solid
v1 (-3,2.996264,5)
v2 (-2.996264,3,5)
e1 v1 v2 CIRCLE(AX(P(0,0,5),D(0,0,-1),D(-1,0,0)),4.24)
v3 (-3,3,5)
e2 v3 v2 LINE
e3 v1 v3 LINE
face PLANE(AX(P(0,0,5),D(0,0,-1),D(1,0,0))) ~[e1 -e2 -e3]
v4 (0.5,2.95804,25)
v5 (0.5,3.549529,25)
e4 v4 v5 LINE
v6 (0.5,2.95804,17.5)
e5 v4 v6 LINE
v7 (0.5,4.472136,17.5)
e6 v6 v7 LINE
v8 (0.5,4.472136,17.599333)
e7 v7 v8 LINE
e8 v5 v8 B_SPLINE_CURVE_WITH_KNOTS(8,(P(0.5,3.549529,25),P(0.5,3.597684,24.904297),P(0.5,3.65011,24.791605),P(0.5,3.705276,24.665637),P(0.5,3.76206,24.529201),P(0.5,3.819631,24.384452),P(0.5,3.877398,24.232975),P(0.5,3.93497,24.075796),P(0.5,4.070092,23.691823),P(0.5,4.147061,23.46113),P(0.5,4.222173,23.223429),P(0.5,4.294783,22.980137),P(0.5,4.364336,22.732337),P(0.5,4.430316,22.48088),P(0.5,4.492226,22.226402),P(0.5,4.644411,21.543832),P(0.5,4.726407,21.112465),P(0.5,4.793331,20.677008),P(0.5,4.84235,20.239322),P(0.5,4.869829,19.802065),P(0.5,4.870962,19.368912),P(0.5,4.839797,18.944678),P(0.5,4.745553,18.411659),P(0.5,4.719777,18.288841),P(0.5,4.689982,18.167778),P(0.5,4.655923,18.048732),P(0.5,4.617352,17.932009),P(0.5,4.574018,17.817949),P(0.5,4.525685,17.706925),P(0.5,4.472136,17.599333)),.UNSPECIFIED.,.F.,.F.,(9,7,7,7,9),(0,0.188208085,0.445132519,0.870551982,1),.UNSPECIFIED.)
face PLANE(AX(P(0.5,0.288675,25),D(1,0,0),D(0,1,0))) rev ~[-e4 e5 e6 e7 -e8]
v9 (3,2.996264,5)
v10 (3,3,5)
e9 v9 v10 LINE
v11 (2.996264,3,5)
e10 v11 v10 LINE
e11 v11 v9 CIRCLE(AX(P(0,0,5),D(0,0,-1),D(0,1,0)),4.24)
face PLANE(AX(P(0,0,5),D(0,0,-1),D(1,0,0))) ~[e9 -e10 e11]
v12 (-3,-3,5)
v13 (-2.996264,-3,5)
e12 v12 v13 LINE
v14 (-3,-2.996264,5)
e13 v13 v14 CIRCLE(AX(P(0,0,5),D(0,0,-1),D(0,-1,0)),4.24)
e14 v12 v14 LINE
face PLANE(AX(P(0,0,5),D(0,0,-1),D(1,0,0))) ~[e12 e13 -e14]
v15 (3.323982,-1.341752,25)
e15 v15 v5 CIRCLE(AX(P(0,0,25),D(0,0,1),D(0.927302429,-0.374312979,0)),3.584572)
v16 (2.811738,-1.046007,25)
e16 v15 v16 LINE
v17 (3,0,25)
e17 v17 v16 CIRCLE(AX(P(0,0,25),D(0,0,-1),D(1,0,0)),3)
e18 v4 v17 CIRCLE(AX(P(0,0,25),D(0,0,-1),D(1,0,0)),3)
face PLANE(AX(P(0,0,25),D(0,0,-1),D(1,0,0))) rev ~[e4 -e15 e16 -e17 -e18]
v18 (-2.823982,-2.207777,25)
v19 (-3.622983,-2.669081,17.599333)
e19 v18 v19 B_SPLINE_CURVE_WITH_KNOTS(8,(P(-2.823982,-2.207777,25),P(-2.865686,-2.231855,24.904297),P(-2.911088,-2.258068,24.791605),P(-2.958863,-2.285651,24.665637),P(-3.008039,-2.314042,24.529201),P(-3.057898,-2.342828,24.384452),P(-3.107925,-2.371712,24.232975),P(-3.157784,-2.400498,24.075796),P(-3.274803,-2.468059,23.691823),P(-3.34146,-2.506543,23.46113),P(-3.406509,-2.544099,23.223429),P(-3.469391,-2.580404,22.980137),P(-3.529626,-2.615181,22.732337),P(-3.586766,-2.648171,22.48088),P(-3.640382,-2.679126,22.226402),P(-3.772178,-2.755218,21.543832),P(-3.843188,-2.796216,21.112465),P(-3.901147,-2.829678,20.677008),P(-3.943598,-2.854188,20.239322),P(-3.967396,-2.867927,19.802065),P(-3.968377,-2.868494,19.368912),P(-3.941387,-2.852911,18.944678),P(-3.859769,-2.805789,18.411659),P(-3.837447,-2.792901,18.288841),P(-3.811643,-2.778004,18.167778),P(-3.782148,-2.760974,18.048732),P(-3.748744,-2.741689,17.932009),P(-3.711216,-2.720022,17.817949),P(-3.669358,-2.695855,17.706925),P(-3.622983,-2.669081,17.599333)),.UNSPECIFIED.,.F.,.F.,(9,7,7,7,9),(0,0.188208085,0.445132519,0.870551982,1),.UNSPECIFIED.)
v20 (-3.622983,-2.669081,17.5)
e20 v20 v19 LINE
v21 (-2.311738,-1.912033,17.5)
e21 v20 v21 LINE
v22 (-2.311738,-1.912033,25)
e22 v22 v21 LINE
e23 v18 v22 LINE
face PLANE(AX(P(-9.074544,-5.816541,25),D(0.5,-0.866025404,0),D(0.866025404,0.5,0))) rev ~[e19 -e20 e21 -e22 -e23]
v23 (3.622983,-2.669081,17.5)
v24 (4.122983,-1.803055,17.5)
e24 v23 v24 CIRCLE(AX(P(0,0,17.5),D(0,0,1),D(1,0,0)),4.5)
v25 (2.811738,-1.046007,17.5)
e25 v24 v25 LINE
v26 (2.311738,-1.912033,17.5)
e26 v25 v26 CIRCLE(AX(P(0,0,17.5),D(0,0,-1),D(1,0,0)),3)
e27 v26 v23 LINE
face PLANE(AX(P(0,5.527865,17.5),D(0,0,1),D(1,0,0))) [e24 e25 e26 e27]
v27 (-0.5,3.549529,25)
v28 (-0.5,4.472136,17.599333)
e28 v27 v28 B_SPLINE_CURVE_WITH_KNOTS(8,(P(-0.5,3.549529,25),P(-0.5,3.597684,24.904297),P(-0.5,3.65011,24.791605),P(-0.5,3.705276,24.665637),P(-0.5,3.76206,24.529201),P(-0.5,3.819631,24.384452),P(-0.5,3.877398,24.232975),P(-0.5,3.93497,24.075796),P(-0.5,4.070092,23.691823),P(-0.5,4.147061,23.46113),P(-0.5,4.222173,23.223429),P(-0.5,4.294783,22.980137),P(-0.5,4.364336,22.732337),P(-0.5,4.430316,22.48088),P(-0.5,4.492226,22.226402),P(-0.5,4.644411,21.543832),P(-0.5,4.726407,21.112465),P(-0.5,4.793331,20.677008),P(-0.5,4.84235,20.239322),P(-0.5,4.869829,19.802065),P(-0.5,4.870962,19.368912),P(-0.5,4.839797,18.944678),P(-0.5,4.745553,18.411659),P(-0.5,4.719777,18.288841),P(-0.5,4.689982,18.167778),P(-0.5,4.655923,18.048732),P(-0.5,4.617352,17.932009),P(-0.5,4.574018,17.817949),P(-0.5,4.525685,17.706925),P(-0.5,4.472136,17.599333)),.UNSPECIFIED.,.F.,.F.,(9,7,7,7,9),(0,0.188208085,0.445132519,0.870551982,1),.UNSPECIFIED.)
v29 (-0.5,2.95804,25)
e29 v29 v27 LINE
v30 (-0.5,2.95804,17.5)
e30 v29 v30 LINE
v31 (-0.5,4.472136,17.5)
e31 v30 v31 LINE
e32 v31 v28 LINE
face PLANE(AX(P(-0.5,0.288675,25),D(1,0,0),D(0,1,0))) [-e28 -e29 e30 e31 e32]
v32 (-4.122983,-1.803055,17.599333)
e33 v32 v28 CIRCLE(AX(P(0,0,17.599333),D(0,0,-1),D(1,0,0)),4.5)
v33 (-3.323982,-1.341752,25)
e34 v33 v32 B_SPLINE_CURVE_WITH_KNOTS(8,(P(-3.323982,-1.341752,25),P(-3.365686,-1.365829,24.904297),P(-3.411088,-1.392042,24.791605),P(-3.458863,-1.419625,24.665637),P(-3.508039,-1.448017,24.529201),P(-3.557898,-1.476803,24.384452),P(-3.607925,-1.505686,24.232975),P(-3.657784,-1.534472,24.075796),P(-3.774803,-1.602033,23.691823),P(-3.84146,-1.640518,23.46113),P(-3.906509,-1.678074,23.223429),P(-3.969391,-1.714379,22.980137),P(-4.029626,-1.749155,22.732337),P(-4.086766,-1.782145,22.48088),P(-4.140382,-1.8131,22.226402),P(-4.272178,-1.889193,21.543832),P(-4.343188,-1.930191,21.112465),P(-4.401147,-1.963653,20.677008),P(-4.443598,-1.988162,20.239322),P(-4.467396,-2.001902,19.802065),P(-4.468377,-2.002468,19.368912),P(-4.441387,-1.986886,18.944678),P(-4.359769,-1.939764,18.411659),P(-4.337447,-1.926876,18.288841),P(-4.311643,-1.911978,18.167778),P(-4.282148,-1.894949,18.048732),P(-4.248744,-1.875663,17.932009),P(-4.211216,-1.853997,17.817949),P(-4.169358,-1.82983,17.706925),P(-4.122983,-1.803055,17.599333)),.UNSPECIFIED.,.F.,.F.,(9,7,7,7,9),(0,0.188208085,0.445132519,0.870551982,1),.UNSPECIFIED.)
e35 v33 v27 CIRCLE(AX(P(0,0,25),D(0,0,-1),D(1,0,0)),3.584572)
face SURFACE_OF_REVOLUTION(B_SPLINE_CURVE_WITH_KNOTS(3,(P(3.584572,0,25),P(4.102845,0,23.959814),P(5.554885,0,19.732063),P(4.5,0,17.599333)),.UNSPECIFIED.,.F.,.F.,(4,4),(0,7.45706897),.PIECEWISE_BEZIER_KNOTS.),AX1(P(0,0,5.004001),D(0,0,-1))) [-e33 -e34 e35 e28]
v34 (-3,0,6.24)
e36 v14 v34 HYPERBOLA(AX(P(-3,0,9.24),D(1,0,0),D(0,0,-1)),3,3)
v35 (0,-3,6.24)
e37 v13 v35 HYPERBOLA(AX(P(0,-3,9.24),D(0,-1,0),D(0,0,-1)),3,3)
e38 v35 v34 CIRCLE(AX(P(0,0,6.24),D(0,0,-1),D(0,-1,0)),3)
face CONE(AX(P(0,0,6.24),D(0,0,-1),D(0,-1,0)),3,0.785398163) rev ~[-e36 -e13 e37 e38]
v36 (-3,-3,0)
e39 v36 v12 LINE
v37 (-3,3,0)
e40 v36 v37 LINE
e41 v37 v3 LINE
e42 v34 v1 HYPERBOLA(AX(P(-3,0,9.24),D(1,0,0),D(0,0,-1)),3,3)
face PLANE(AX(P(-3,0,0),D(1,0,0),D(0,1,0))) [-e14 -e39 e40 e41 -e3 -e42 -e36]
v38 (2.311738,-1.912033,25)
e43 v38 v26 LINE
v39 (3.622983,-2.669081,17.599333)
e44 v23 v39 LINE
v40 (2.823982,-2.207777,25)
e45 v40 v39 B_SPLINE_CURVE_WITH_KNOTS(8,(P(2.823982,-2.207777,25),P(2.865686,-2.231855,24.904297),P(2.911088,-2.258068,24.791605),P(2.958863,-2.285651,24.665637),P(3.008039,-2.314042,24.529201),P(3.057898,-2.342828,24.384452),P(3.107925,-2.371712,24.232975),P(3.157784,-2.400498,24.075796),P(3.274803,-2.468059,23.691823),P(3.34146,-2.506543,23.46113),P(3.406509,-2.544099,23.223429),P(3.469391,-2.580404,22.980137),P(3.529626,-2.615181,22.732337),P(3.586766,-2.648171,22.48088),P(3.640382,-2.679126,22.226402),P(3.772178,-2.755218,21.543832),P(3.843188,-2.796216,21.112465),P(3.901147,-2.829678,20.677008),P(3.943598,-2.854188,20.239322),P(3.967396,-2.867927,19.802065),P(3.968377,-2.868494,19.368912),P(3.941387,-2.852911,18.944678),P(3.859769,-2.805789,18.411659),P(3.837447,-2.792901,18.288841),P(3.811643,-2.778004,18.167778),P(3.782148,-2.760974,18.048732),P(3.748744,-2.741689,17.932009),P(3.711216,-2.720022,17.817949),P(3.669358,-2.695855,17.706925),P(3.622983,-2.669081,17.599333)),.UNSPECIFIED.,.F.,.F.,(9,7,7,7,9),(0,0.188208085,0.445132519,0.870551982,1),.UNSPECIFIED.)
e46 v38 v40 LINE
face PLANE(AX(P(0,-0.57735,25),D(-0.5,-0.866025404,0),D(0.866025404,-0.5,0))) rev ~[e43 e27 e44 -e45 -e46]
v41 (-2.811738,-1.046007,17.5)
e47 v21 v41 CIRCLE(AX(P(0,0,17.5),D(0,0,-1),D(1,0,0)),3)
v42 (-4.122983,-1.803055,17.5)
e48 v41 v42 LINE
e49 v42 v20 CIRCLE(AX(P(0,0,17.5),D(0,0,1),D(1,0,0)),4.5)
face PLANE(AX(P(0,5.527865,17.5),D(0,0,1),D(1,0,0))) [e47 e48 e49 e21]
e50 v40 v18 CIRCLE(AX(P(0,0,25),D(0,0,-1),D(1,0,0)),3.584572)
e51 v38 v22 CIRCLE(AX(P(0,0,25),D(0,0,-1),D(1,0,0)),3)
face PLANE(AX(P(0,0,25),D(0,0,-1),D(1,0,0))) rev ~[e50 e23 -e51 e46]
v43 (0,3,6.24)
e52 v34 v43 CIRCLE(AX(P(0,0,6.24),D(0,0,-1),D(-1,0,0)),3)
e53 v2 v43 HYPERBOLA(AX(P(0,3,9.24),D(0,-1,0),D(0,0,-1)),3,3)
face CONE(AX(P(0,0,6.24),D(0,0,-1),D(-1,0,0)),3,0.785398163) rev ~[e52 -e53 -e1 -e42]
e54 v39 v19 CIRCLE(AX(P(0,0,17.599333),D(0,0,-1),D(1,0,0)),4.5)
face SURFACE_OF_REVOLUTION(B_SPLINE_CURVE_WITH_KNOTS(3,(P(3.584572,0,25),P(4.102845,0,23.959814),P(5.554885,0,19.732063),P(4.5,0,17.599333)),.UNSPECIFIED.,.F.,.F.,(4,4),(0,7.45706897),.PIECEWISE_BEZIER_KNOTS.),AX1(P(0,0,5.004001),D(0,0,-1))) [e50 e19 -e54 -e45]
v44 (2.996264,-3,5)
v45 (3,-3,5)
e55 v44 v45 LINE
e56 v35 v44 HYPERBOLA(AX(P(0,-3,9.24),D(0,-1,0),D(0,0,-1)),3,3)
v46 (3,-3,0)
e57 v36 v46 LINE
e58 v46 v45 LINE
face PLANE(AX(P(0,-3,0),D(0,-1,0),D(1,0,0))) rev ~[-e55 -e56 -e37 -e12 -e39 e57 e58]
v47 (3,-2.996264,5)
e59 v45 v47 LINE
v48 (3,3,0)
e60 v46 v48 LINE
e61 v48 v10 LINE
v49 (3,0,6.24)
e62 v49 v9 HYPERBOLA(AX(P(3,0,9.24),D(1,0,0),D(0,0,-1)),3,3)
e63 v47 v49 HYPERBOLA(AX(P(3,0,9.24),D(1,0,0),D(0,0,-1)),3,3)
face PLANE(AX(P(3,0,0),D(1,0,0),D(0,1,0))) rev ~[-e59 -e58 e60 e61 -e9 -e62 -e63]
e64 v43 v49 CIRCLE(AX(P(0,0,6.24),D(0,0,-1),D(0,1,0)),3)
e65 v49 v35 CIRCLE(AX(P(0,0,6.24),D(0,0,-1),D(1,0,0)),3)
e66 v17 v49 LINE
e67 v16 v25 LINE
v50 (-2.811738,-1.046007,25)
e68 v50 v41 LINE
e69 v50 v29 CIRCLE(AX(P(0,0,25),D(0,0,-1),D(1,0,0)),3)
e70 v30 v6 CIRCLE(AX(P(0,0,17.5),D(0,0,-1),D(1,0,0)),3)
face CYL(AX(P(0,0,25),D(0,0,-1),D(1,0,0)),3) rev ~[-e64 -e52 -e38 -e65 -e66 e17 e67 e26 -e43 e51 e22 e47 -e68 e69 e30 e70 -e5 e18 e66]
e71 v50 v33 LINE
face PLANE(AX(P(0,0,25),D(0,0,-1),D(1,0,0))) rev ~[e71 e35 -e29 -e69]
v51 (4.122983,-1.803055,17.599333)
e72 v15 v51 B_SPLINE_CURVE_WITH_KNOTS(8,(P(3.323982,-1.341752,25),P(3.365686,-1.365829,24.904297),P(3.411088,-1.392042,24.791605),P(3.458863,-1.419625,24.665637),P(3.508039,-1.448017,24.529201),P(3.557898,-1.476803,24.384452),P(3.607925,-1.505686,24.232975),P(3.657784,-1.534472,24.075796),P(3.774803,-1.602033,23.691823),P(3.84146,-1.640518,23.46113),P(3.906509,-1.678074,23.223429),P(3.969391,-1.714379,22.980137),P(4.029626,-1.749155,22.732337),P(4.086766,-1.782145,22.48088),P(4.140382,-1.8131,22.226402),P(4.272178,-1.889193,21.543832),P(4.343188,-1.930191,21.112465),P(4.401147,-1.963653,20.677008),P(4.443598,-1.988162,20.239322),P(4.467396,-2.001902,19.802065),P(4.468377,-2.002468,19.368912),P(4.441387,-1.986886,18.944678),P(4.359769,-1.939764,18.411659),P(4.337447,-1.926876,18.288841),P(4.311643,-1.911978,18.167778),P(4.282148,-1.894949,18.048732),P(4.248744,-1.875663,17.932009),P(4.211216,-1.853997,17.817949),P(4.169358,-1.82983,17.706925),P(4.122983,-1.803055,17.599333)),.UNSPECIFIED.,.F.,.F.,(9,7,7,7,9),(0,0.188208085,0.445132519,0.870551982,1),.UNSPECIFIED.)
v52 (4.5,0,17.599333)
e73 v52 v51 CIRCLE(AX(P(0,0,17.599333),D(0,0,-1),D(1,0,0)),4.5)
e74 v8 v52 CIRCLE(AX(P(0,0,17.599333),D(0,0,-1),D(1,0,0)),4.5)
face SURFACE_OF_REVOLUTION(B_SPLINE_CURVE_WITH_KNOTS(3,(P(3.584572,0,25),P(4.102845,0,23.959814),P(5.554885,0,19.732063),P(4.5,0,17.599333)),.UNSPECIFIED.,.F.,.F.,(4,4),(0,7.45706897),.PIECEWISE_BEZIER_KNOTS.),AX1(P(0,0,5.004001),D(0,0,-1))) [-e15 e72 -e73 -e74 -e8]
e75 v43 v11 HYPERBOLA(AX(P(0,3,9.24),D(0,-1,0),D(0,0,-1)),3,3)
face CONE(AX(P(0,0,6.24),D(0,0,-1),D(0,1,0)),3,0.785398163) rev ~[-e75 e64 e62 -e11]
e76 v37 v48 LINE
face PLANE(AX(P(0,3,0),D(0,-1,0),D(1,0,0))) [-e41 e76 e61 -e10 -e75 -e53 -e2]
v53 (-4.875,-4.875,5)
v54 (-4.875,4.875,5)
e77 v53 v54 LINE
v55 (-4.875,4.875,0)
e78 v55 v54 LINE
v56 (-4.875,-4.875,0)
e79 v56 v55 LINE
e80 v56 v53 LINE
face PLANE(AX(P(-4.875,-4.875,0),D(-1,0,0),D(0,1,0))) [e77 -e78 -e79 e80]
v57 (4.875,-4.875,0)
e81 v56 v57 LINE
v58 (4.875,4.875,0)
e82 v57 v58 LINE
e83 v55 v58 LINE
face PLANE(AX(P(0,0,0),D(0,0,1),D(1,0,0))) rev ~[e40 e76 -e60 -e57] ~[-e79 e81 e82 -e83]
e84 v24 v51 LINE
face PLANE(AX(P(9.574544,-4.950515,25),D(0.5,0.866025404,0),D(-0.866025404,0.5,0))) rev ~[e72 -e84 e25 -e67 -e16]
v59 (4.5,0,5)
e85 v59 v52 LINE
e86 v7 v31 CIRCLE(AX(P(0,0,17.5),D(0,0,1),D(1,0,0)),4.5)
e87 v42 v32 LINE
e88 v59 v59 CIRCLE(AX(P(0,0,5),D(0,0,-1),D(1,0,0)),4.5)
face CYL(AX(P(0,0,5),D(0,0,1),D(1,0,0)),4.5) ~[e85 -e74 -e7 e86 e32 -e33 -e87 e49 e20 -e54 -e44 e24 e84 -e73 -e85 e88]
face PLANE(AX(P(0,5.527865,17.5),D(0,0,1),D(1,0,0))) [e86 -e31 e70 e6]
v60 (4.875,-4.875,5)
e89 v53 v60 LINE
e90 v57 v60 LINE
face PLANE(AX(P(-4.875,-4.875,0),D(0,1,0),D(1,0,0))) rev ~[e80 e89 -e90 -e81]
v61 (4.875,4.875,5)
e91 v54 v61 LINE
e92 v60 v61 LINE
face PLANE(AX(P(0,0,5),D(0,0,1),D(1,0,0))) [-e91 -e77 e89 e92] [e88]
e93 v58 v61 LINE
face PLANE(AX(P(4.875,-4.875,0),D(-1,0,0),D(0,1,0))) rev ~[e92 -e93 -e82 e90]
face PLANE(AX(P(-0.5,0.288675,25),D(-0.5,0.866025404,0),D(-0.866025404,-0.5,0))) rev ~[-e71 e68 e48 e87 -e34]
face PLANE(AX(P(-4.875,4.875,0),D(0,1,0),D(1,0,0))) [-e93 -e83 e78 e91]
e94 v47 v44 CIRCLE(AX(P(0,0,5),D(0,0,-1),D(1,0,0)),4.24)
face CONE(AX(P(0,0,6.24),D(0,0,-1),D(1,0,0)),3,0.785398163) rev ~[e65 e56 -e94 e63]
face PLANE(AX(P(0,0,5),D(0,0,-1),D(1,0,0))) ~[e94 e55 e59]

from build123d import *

# Parameters (mm, degrees)
F0_W         = 9.75
F0_H         = 9.75
F0_W_2       = 6
F0_H_2       = 6
F1_DEPTH     = 5
F4_W         = 1
F4_H         = 10.4783805975
F5_DEPTH     = 7.5
F6_T4_ANGLE  = 90
F6_T10_ANGLE = 90
F6_T16_ANGLE = 90
F6_T22_ANGLE = 90


# Not quite as in the source:
# - a fillet or chamfer that OpenCascade refuses, or shapes differently, is made with other operations: its cross-section is extruded or revolved along the edge and cut away or added


with BuildPart() as f1:
    # F0 (on Top) → F1 (new body)
    with BuildSketch(Plane.XY):
        Rectangle(F0_W, F0_H)
        Rectangle(F0_W_2, F0_H_2, mode=Mode.SUBTRACT)
    extrude(amount=F1_DEPTH)

    # F2 (on Front) → F3 (revolve)
    with BuildSketch(Plane.XZ):
        with BuildLine():
            Line((3, 25), (3, 5))
            Line((3, 5), (4.5, 5))
            Line((4.5, 5), (4.5, 17.5993331894))
            add(Edge.make_bspline(
                [(3.5845720258, 25), (4.1028451178, 23.9598143656), (5.5548848687, 19.7320627697), (4.5, 17.5993331894)],
                knots=[0, 0, 0, 0, 7.4570689696, 7.4570689696, 7.4570689696, 7.4570689696], degree=3))
            Line((3.5845720258, 25), (3, 25))
        make_face()
    revolve(axis=Axis((0, 0, 5.0040013157), (0, 0, -1)))

    # F4 (on face) → F5 (cut)
    with BuildSketch(Plane.XY.offset(25)):
        with Locations((0, 5.5278654333)):
            Rectangle(F4_W, F4_H)
        Polygon((0, -0.5773502692), (-0.5, 0.2886751346), (-9.574543788, -4.9505151642), (-9.074543788, -5.8165405679), align=None)
        Polygon((0.5, 0.2886751346), (-0.5, 0.2886751346), (0, -0.5773502692), align=None)
        Polygon((9.574543788, -4.9505151642), (0.5, 0.2886751346), (0, -0.5773502692), (9.074543788, -5.8165405679), align=None)
    extrude(amount=-F5_DEPTH, mode=Mode.SUBTRACT)

    # F6: chamfer of 1.24 on 1 edges, made by hand


with BuildPart() as f6_tool2:
    # F6_s3 → F6_t4 (revolve)
    with BuildSketch(Plane.YZ):
        Polygon((-3, 6.24), (-4.24, 5), (-3, 5), align=None)
    revolve(axis=Axis((0, 0, 5), (0, 0, -1)), revolution_arc=F6_T4_ANGLE)

    split(bisect_by=Plane.XZ.offset(3), keep=Keep.BOTTOM)

    split(bisect_by=Plane.YZ.offset(-3), keep=Keep.TOP)


with BuildPart() as f1_1:
    add(f1.part)

    # F6_t1: cut F6_tool2
    add(f6_tool2.part, mode=Mode.SUBTRACT)


with BuildPart() as f6_tool8:
    # F6_s9 → F6_t10 (revolve)
    with BuildSketch(Plane.XZ):
        Polygon((3, 6.24), (4.24, 5), (3, 5), align=None)
    revolve(axis=Axis((0, 0, 5), (0, 0, -1)), revolution_arc=F6_T10_ANGLE)

    split(bisect_by=Plane.YZ.offset(3), keep=Keep.BOTTOM)

    split(bisect_by=Plane.XZ.offset(3), keep=Keep.BOTTOM)


with BuildPart() as f1_2:
    add(f1_1.part)

    # F6_t7: cut F6_tool8
    add(f6_tool8.part, mode=Mode.SUBTRACT)


with BuildPart() as f6_tool14:
    # F6_s15 → F6_t16 (revolve)
    with BuildSketch(Plane.XZ):
        Polygon((-3, 6.24), (-4.24, 5), (-3, 5), align=None)
    revolve(axis=Axis((0, 0, 5), (0, 0, -1)), revolution_arc=F6_T16_ANGLE)

    split(bisect_by=Plane.YZ.offset(-3), keep=Keep.TOP)

    split(bisect_by=Plane.XZ.offset(-3), keep=Keep.TOP)


with BuildPart() as f1_3:
    add(f1_2.part)

    # F6_t13: cut F6_tool14
    add(f6_tool14.part, mode=Mode.SUBTRACT)


with BuildPart() as f6_tool20:
    # F6_s21 → F6_t22 (revolve)
    with BuildSketch(Plane.YZ):
        Polygon((3, 6.24), (4.24, 5), (3, 5), align=None)
    revolve(axis=Axis((0, 0, 5), (0, 0, -1)), revolution_arc=F6_T22_ANGLE)

    split(bisect_by=Plane.YZ.offset(3), keep=Keep.BOTTOM)

    split(bisect_by=Plane.XZ.offset(-3), keep=Keep.TOP)


with BuildPart() as f1_4:
    add(f1_3.part)

    # F6_t19: cut F6_tool20
    add(f6_tool20.part, mode=Mode.SUBTRACT)


solid = f1_4.part
